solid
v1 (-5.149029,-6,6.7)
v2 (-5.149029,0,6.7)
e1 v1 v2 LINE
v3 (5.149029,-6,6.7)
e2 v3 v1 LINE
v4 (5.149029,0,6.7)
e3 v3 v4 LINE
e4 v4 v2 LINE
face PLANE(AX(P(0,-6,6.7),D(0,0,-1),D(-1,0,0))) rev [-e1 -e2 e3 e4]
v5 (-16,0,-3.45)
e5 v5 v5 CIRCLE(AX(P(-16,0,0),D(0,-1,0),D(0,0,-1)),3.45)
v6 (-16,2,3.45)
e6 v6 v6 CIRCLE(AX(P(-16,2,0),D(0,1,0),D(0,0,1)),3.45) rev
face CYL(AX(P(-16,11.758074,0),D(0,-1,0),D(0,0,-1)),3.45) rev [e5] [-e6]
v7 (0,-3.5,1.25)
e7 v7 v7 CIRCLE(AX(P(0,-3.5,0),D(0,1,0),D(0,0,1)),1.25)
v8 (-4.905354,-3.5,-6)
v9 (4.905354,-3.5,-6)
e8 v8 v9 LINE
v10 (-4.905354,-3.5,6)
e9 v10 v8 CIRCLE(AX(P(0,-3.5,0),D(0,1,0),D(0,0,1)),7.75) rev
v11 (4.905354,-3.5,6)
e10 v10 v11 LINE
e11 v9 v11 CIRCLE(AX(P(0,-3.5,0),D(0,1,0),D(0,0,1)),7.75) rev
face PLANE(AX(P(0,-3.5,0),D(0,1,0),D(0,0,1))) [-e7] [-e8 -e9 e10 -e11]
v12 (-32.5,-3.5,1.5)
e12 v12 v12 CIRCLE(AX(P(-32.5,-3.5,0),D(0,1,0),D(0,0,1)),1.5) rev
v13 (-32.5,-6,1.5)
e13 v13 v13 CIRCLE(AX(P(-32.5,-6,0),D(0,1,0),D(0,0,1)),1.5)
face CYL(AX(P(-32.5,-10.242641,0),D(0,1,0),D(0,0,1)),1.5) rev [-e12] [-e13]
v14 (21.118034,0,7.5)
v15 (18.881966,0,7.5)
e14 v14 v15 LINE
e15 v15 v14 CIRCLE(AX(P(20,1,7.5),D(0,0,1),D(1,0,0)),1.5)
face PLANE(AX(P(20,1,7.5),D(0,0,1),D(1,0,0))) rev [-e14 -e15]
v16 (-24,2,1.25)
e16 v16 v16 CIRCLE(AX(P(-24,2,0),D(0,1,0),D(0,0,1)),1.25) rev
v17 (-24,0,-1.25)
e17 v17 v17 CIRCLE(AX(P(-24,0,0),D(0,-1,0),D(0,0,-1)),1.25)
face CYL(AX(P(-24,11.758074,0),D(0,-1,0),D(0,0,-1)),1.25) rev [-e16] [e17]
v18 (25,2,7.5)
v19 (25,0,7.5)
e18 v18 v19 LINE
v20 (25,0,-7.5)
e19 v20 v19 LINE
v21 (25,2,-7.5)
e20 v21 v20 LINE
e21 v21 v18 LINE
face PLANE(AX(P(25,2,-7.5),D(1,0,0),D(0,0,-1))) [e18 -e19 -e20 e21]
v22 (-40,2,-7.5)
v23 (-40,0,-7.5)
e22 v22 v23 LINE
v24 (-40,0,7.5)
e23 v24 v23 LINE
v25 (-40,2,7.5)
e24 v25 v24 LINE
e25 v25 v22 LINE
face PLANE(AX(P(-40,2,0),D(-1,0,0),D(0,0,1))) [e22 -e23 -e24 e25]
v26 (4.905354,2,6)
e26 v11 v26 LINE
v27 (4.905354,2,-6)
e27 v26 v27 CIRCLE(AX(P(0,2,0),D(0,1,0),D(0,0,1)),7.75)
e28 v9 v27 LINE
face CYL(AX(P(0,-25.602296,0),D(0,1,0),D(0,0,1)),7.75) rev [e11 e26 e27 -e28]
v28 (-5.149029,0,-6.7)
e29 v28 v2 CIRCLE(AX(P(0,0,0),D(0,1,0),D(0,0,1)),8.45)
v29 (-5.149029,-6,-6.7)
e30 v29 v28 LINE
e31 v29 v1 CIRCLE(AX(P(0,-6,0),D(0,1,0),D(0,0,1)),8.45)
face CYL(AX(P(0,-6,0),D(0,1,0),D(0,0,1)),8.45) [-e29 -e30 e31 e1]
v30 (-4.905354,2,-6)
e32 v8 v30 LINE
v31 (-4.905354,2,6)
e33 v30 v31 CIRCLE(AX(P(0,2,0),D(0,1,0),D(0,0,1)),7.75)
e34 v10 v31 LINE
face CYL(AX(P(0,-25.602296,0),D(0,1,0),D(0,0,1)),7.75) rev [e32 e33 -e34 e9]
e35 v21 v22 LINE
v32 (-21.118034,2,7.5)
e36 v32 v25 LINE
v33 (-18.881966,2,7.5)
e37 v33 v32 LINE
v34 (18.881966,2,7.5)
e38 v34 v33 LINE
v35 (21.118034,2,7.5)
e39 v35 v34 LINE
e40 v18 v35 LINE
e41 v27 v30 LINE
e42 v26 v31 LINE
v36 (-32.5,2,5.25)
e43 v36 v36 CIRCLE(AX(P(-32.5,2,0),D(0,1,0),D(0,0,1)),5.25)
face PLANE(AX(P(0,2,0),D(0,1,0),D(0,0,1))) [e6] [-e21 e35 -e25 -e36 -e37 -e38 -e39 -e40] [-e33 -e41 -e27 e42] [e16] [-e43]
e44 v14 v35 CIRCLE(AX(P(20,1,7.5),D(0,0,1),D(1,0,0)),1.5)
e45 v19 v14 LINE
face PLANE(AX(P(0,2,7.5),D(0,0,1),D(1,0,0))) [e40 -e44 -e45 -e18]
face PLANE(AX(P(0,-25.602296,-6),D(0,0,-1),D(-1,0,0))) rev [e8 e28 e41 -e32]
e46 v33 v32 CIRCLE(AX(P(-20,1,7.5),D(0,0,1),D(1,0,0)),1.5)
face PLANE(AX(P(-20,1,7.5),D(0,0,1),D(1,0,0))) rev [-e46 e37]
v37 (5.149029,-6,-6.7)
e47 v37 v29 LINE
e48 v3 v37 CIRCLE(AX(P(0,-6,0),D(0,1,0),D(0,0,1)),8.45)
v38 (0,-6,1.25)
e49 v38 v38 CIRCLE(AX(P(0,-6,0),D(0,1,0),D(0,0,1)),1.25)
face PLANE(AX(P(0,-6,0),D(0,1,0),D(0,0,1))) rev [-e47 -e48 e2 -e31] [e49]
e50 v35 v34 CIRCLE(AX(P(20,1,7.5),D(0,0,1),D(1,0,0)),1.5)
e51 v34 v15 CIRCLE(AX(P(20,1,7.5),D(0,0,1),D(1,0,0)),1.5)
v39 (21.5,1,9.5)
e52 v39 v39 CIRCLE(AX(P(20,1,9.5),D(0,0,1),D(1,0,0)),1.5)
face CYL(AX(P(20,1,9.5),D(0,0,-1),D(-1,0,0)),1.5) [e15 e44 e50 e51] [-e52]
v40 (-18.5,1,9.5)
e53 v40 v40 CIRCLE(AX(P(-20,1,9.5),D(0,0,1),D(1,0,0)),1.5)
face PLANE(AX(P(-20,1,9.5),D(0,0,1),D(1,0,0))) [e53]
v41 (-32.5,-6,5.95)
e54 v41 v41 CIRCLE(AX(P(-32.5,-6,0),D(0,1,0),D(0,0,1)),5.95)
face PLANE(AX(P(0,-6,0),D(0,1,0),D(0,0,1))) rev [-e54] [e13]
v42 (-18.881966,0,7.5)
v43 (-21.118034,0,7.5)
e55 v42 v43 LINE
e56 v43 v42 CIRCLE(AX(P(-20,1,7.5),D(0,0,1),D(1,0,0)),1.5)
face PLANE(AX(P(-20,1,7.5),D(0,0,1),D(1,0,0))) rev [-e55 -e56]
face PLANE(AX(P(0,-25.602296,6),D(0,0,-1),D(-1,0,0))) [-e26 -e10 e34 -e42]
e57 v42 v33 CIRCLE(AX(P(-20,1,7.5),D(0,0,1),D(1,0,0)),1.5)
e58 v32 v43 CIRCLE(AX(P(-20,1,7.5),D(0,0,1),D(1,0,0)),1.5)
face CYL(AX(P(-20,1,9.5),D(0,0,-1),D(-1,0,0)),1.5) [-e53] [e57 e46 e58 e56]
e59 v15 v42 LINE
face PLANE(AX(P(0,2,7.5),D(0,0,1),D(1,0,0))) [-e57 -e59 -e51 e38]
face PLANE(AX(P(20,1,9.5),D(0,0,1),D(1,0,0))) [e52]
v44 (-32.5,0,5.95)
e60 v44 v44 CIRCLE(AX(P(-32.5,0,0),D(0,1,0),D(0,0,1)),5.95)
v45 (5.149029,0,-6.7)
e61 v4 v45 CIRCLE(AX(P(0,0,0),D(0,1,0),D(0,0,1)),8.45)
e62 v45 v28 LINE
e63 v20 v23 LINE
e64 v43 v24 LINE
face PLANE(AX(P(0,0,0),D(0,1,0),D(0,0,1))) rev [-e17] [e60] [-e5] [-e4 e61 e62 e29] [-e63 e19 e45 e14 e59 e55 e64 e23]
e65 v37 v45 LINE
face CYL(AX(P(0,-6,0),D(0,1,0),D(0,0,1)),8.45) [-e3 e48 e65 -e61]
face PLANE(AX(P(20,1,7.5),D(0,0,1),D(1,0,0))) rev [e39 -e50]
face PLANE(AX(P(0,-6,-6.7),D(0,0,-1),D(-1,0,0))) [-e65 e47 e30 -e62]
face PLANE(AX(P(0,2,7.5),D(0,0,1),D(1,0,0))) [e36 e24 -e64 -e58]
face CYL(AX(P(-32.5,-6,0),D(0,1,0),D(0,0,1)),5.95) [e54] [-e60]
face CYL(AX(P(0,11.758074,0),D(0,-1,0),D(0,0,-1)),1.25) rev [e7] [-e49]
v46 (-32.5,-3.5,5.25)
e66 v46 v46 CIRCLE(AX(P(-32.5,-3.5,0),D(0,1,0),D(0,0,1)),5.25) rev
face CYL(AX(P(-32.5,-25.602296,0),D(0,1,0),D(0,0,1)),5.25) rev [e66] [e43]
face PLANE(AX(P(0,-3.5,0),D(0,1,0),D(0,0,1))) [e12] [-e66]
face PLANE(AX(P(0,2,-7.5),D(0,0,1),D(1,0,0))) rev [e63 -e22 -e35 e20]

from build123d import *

# Parameters (mm, degrees)
SKETCH_1_W            = 65
SKETCH_1_H            = 15
EXTRUDE_1_DEPTH       = 2
SKETCH_2_R            = 1.25
SKETCH_2_R_2          = 3.45
SKETCH_2_R_3          = 1.5
CUT_EXTRUDE_1_DEPTH   = 2
SKETCH_4_R            = 1.5
EXTRUDE_2_DEPTH       = 2
SKETCH_5_R            = 5.95
SKETCH_5_R_2          = 5.25
EXTRUDE_3_DEPTH       = 8
EXTRUDE_START         = -8
EXTRUDE_4_OUTLINE_R   = 5.25
EXTRUDE_4_OUTLINE_R_2 = 1.25
EXTRUDE_4_DEPTH       = 8
CUT_EXTRUDE_START     = -5.5
SKETCH_5_11_R         = 5.25
SKETCH_5_11_R_2       = 1.5
SKETCH_5_11_R_3       = 1.25
CUT_EXTRUDE_2_DEPTH   = 5.5
CUT_EXTRUDE_START_2   = -8
SKETCH_5_12_R         = 1.5
CUT_EXTRUDE_3_DEPTH   = 8


# Read off the part's stored shape, not the designer's step: 凸台-拉伸4
with BuildPart() as part:
    # 草图1 → 凸台-拉伸1 (new body)
    with BuildSketch(Plane(origin=(0, 0, 0), x_dir=(1, 0, 0), z_dir=(0, 1, 0))):
        with Locations((-7.5, 0)):
            Rectangle(SKETCH_1_W, SKETCH_1_H)
    extrude(amount=EXTRUDE_1_DEPTH)

    # 草图2 → 切除-拉伸1 (cut)
    with BuildSketch(Plane(origin=(0, 0, 0), x_dir=(1, 0, 0), z_dir=(0, 1, 0))):
        with Locations(Location((0, 0, 0), (0, 0, 270))):
            Circle(SKETCH_2_R)
        with Locations(Location((-16, 0, 0), (0, 0, 90))):
            Circle(SKETCH_2_R_2)
        with Locations(Location((-24, 0, 0), (0, 0, 90))):
            Circle(SKETCH_2_R)
        with Locations(Location((-32.5, 0, 0), (0, 0, 270))):
            Circle(SKETCH_2_R_3)
    extrude(amount=CUT_EXTRUDE_1_DEPTH, mode=Mode.SUBTRACT)

    # 草图4 → 凸台-拉伸2 (add)
    with BuildSketch(Plane.XY.offset(7.5)):
        with Locations(Location((20, 1, 0), (0, 0, 221.810314896))):
            Circle(SKETCH_4_R)
        with Locations(Location((-20, 1, 0), (0, 0, 221.810314896))):
            Circle(SKETCH_4_R)
    extrude(amount=EXTRUDE_2_DEPTH)

    # 草图5 → 凸台-拉伸3 (add)
    # profile 1 of 2: a face of its own
    with BuildSketch(Plane(origin=(0, 2, 0), x_dir=(1, 0, 0), z_dir=(0, 1, 0))):
        with Locations(Location((-32.5, 0, 0), (0, 0, 270))):
            Circle(SKETCH_5_R)
        with Locations(Location((-32.5, 0, 0), (0, 0, 270))):
            Circle(SKETCH_5_R_2, mode=Mode.SUBTRACT)
    # profile 2 of 2: a face of its own
    with BuildSketch(Plane(origin=(0, 2, 0), x_dir=(1, 0, 0), z_dir=(0, 1, 0))):
        with BuildLine():
            Line((5.149029035, -6.7), (-5.149029035, -6.7))
            ThreePointArc((-5.149029035, -6.7), (-8.45, 0), (-5.149029035, 6.7))
            Line((-5.149029035, 6.7), (5.149029035, 6.7))
            ThreePointArc((5.149029035, 6.7), (8.45, 0), (5.149029035, -6.7))
        make_face()
        with BuildLine():
            ThreePointArc((4.905354218, -6), (7.75, 0), (4.905354218, 6))
            Line((4.905354218, 6), (-4.905354218, 6))
            ThreePointArc((-4.905354218, 6), (-7.75, 0), (-4.905354218, -6))
            Line((-4.905354218, -6), (4.905354218, -6))
        make_face(mode=Mode.SUBTRACT)
    extrude(amount=-EXTRUDE_3_DEPTH)

    # 凸台-拉伸4 outline → 凸台-拉伸4 (add)
    # profile 1 of 2: a face of its own
    with BuildSketch(Plane(origin=(0, 2, 0), x_dir=(1, 0, 0), z_dir=(0, 1, 0)).offset(EXTRUDE_START)):
        with Locations((-32.5, 0)):
            Circle(EXTRUDE_4_OUTLINE_R)
    # profile 2 of 2: a face of its own
    with BuildSketch(Plane(origin=(0, 2, 0), x_dir=(1, 0, 0), z_dir=(0, 1, 0)).offset(EXTRUDE_START)):
        with BuildLine():
            Line((-4.905354218, -6), (4.905354218, -6))
            ThreePointArc((4.905354218, -6), (7.75, 0), (4.905354218, 6))
            Line((4.905354218, 6), (-4.905354218, 6))
            ThreePointArc((-4.905354218, 6), (-7.75, 0), (-4.905354218, -6))
        make_face()
        Circle(EXTRUDE_4_OUTLINE_R_2, mode=Mode.SUBTRACT)
    extrude(amount=EXTRUDE_4_DEPTH)

    # 草图5<11> → 切除-拉伸2 (cut)
    # profile 1 of 2: a face of its own
    with BuildSketch(Plane(origin=(0, 2, 0), x_dir=(1, 0, 0), z_dir=(0, 1, 0)).offset(CUT_EXTRUDE_START)):
        with Locations(Location((-32.5, 0, 0), (0, 0, 270))):
            Circle(SKETCH_5_11_R)
        with Locations(Location((-32.5, 0, 0), (0, 0, 270))):
            Circle(SKETCH_5_11_R_2, mode=Mode.SUBTRACT)
    # profile 2 of 2: a face of its own
    with BuildSketch(Plane(origin=(0, 2, 0), x_dir=(1, 0, 0), z_dir=(0, 1, 0)).offset(CUT_EXTRUDE_START)):
        with BuildLine():
            Line((4.905354218, -6), (-4.905354218, -6))
            ThreePointArc((-4.905354218, -6), (-7.75, 0), (-4.905354218, 6))
            Line((-4.905354218, 6), (4.905354218, 6))
            ThreePointArc((4.905354218, 6), (7.75, 0), (4.905354218, -6))
        make_face()
        with Locations(Location((0, 0, 0), (0, 0, 270))):
            Circle(SKETCH_5_11_R_3, mode=Mode.SUBTRACT)
    extrude(amount=CUT_EXTRUDE_2_DEPTH, mode=Mode.SUBTRACT)

    # 草图5<12> → 切除-拉伸3 (cut)
    with BuildSketch(Plane(origin=(0, 2, 0), x_dir=(1, 0, 0), z_dir=(0, 1, 0)).offset(CUT_EXTRUDE_START_2)):
        with Locations(Location((-32.5, 0, 0), (0, 0, 270))):
            Circle(SKETCH_5_12_R)
    extrude(amount=CUT_EXTRUDE_3_DEPTH, mode=Mode.SUBTRACT)


solid = part.part
